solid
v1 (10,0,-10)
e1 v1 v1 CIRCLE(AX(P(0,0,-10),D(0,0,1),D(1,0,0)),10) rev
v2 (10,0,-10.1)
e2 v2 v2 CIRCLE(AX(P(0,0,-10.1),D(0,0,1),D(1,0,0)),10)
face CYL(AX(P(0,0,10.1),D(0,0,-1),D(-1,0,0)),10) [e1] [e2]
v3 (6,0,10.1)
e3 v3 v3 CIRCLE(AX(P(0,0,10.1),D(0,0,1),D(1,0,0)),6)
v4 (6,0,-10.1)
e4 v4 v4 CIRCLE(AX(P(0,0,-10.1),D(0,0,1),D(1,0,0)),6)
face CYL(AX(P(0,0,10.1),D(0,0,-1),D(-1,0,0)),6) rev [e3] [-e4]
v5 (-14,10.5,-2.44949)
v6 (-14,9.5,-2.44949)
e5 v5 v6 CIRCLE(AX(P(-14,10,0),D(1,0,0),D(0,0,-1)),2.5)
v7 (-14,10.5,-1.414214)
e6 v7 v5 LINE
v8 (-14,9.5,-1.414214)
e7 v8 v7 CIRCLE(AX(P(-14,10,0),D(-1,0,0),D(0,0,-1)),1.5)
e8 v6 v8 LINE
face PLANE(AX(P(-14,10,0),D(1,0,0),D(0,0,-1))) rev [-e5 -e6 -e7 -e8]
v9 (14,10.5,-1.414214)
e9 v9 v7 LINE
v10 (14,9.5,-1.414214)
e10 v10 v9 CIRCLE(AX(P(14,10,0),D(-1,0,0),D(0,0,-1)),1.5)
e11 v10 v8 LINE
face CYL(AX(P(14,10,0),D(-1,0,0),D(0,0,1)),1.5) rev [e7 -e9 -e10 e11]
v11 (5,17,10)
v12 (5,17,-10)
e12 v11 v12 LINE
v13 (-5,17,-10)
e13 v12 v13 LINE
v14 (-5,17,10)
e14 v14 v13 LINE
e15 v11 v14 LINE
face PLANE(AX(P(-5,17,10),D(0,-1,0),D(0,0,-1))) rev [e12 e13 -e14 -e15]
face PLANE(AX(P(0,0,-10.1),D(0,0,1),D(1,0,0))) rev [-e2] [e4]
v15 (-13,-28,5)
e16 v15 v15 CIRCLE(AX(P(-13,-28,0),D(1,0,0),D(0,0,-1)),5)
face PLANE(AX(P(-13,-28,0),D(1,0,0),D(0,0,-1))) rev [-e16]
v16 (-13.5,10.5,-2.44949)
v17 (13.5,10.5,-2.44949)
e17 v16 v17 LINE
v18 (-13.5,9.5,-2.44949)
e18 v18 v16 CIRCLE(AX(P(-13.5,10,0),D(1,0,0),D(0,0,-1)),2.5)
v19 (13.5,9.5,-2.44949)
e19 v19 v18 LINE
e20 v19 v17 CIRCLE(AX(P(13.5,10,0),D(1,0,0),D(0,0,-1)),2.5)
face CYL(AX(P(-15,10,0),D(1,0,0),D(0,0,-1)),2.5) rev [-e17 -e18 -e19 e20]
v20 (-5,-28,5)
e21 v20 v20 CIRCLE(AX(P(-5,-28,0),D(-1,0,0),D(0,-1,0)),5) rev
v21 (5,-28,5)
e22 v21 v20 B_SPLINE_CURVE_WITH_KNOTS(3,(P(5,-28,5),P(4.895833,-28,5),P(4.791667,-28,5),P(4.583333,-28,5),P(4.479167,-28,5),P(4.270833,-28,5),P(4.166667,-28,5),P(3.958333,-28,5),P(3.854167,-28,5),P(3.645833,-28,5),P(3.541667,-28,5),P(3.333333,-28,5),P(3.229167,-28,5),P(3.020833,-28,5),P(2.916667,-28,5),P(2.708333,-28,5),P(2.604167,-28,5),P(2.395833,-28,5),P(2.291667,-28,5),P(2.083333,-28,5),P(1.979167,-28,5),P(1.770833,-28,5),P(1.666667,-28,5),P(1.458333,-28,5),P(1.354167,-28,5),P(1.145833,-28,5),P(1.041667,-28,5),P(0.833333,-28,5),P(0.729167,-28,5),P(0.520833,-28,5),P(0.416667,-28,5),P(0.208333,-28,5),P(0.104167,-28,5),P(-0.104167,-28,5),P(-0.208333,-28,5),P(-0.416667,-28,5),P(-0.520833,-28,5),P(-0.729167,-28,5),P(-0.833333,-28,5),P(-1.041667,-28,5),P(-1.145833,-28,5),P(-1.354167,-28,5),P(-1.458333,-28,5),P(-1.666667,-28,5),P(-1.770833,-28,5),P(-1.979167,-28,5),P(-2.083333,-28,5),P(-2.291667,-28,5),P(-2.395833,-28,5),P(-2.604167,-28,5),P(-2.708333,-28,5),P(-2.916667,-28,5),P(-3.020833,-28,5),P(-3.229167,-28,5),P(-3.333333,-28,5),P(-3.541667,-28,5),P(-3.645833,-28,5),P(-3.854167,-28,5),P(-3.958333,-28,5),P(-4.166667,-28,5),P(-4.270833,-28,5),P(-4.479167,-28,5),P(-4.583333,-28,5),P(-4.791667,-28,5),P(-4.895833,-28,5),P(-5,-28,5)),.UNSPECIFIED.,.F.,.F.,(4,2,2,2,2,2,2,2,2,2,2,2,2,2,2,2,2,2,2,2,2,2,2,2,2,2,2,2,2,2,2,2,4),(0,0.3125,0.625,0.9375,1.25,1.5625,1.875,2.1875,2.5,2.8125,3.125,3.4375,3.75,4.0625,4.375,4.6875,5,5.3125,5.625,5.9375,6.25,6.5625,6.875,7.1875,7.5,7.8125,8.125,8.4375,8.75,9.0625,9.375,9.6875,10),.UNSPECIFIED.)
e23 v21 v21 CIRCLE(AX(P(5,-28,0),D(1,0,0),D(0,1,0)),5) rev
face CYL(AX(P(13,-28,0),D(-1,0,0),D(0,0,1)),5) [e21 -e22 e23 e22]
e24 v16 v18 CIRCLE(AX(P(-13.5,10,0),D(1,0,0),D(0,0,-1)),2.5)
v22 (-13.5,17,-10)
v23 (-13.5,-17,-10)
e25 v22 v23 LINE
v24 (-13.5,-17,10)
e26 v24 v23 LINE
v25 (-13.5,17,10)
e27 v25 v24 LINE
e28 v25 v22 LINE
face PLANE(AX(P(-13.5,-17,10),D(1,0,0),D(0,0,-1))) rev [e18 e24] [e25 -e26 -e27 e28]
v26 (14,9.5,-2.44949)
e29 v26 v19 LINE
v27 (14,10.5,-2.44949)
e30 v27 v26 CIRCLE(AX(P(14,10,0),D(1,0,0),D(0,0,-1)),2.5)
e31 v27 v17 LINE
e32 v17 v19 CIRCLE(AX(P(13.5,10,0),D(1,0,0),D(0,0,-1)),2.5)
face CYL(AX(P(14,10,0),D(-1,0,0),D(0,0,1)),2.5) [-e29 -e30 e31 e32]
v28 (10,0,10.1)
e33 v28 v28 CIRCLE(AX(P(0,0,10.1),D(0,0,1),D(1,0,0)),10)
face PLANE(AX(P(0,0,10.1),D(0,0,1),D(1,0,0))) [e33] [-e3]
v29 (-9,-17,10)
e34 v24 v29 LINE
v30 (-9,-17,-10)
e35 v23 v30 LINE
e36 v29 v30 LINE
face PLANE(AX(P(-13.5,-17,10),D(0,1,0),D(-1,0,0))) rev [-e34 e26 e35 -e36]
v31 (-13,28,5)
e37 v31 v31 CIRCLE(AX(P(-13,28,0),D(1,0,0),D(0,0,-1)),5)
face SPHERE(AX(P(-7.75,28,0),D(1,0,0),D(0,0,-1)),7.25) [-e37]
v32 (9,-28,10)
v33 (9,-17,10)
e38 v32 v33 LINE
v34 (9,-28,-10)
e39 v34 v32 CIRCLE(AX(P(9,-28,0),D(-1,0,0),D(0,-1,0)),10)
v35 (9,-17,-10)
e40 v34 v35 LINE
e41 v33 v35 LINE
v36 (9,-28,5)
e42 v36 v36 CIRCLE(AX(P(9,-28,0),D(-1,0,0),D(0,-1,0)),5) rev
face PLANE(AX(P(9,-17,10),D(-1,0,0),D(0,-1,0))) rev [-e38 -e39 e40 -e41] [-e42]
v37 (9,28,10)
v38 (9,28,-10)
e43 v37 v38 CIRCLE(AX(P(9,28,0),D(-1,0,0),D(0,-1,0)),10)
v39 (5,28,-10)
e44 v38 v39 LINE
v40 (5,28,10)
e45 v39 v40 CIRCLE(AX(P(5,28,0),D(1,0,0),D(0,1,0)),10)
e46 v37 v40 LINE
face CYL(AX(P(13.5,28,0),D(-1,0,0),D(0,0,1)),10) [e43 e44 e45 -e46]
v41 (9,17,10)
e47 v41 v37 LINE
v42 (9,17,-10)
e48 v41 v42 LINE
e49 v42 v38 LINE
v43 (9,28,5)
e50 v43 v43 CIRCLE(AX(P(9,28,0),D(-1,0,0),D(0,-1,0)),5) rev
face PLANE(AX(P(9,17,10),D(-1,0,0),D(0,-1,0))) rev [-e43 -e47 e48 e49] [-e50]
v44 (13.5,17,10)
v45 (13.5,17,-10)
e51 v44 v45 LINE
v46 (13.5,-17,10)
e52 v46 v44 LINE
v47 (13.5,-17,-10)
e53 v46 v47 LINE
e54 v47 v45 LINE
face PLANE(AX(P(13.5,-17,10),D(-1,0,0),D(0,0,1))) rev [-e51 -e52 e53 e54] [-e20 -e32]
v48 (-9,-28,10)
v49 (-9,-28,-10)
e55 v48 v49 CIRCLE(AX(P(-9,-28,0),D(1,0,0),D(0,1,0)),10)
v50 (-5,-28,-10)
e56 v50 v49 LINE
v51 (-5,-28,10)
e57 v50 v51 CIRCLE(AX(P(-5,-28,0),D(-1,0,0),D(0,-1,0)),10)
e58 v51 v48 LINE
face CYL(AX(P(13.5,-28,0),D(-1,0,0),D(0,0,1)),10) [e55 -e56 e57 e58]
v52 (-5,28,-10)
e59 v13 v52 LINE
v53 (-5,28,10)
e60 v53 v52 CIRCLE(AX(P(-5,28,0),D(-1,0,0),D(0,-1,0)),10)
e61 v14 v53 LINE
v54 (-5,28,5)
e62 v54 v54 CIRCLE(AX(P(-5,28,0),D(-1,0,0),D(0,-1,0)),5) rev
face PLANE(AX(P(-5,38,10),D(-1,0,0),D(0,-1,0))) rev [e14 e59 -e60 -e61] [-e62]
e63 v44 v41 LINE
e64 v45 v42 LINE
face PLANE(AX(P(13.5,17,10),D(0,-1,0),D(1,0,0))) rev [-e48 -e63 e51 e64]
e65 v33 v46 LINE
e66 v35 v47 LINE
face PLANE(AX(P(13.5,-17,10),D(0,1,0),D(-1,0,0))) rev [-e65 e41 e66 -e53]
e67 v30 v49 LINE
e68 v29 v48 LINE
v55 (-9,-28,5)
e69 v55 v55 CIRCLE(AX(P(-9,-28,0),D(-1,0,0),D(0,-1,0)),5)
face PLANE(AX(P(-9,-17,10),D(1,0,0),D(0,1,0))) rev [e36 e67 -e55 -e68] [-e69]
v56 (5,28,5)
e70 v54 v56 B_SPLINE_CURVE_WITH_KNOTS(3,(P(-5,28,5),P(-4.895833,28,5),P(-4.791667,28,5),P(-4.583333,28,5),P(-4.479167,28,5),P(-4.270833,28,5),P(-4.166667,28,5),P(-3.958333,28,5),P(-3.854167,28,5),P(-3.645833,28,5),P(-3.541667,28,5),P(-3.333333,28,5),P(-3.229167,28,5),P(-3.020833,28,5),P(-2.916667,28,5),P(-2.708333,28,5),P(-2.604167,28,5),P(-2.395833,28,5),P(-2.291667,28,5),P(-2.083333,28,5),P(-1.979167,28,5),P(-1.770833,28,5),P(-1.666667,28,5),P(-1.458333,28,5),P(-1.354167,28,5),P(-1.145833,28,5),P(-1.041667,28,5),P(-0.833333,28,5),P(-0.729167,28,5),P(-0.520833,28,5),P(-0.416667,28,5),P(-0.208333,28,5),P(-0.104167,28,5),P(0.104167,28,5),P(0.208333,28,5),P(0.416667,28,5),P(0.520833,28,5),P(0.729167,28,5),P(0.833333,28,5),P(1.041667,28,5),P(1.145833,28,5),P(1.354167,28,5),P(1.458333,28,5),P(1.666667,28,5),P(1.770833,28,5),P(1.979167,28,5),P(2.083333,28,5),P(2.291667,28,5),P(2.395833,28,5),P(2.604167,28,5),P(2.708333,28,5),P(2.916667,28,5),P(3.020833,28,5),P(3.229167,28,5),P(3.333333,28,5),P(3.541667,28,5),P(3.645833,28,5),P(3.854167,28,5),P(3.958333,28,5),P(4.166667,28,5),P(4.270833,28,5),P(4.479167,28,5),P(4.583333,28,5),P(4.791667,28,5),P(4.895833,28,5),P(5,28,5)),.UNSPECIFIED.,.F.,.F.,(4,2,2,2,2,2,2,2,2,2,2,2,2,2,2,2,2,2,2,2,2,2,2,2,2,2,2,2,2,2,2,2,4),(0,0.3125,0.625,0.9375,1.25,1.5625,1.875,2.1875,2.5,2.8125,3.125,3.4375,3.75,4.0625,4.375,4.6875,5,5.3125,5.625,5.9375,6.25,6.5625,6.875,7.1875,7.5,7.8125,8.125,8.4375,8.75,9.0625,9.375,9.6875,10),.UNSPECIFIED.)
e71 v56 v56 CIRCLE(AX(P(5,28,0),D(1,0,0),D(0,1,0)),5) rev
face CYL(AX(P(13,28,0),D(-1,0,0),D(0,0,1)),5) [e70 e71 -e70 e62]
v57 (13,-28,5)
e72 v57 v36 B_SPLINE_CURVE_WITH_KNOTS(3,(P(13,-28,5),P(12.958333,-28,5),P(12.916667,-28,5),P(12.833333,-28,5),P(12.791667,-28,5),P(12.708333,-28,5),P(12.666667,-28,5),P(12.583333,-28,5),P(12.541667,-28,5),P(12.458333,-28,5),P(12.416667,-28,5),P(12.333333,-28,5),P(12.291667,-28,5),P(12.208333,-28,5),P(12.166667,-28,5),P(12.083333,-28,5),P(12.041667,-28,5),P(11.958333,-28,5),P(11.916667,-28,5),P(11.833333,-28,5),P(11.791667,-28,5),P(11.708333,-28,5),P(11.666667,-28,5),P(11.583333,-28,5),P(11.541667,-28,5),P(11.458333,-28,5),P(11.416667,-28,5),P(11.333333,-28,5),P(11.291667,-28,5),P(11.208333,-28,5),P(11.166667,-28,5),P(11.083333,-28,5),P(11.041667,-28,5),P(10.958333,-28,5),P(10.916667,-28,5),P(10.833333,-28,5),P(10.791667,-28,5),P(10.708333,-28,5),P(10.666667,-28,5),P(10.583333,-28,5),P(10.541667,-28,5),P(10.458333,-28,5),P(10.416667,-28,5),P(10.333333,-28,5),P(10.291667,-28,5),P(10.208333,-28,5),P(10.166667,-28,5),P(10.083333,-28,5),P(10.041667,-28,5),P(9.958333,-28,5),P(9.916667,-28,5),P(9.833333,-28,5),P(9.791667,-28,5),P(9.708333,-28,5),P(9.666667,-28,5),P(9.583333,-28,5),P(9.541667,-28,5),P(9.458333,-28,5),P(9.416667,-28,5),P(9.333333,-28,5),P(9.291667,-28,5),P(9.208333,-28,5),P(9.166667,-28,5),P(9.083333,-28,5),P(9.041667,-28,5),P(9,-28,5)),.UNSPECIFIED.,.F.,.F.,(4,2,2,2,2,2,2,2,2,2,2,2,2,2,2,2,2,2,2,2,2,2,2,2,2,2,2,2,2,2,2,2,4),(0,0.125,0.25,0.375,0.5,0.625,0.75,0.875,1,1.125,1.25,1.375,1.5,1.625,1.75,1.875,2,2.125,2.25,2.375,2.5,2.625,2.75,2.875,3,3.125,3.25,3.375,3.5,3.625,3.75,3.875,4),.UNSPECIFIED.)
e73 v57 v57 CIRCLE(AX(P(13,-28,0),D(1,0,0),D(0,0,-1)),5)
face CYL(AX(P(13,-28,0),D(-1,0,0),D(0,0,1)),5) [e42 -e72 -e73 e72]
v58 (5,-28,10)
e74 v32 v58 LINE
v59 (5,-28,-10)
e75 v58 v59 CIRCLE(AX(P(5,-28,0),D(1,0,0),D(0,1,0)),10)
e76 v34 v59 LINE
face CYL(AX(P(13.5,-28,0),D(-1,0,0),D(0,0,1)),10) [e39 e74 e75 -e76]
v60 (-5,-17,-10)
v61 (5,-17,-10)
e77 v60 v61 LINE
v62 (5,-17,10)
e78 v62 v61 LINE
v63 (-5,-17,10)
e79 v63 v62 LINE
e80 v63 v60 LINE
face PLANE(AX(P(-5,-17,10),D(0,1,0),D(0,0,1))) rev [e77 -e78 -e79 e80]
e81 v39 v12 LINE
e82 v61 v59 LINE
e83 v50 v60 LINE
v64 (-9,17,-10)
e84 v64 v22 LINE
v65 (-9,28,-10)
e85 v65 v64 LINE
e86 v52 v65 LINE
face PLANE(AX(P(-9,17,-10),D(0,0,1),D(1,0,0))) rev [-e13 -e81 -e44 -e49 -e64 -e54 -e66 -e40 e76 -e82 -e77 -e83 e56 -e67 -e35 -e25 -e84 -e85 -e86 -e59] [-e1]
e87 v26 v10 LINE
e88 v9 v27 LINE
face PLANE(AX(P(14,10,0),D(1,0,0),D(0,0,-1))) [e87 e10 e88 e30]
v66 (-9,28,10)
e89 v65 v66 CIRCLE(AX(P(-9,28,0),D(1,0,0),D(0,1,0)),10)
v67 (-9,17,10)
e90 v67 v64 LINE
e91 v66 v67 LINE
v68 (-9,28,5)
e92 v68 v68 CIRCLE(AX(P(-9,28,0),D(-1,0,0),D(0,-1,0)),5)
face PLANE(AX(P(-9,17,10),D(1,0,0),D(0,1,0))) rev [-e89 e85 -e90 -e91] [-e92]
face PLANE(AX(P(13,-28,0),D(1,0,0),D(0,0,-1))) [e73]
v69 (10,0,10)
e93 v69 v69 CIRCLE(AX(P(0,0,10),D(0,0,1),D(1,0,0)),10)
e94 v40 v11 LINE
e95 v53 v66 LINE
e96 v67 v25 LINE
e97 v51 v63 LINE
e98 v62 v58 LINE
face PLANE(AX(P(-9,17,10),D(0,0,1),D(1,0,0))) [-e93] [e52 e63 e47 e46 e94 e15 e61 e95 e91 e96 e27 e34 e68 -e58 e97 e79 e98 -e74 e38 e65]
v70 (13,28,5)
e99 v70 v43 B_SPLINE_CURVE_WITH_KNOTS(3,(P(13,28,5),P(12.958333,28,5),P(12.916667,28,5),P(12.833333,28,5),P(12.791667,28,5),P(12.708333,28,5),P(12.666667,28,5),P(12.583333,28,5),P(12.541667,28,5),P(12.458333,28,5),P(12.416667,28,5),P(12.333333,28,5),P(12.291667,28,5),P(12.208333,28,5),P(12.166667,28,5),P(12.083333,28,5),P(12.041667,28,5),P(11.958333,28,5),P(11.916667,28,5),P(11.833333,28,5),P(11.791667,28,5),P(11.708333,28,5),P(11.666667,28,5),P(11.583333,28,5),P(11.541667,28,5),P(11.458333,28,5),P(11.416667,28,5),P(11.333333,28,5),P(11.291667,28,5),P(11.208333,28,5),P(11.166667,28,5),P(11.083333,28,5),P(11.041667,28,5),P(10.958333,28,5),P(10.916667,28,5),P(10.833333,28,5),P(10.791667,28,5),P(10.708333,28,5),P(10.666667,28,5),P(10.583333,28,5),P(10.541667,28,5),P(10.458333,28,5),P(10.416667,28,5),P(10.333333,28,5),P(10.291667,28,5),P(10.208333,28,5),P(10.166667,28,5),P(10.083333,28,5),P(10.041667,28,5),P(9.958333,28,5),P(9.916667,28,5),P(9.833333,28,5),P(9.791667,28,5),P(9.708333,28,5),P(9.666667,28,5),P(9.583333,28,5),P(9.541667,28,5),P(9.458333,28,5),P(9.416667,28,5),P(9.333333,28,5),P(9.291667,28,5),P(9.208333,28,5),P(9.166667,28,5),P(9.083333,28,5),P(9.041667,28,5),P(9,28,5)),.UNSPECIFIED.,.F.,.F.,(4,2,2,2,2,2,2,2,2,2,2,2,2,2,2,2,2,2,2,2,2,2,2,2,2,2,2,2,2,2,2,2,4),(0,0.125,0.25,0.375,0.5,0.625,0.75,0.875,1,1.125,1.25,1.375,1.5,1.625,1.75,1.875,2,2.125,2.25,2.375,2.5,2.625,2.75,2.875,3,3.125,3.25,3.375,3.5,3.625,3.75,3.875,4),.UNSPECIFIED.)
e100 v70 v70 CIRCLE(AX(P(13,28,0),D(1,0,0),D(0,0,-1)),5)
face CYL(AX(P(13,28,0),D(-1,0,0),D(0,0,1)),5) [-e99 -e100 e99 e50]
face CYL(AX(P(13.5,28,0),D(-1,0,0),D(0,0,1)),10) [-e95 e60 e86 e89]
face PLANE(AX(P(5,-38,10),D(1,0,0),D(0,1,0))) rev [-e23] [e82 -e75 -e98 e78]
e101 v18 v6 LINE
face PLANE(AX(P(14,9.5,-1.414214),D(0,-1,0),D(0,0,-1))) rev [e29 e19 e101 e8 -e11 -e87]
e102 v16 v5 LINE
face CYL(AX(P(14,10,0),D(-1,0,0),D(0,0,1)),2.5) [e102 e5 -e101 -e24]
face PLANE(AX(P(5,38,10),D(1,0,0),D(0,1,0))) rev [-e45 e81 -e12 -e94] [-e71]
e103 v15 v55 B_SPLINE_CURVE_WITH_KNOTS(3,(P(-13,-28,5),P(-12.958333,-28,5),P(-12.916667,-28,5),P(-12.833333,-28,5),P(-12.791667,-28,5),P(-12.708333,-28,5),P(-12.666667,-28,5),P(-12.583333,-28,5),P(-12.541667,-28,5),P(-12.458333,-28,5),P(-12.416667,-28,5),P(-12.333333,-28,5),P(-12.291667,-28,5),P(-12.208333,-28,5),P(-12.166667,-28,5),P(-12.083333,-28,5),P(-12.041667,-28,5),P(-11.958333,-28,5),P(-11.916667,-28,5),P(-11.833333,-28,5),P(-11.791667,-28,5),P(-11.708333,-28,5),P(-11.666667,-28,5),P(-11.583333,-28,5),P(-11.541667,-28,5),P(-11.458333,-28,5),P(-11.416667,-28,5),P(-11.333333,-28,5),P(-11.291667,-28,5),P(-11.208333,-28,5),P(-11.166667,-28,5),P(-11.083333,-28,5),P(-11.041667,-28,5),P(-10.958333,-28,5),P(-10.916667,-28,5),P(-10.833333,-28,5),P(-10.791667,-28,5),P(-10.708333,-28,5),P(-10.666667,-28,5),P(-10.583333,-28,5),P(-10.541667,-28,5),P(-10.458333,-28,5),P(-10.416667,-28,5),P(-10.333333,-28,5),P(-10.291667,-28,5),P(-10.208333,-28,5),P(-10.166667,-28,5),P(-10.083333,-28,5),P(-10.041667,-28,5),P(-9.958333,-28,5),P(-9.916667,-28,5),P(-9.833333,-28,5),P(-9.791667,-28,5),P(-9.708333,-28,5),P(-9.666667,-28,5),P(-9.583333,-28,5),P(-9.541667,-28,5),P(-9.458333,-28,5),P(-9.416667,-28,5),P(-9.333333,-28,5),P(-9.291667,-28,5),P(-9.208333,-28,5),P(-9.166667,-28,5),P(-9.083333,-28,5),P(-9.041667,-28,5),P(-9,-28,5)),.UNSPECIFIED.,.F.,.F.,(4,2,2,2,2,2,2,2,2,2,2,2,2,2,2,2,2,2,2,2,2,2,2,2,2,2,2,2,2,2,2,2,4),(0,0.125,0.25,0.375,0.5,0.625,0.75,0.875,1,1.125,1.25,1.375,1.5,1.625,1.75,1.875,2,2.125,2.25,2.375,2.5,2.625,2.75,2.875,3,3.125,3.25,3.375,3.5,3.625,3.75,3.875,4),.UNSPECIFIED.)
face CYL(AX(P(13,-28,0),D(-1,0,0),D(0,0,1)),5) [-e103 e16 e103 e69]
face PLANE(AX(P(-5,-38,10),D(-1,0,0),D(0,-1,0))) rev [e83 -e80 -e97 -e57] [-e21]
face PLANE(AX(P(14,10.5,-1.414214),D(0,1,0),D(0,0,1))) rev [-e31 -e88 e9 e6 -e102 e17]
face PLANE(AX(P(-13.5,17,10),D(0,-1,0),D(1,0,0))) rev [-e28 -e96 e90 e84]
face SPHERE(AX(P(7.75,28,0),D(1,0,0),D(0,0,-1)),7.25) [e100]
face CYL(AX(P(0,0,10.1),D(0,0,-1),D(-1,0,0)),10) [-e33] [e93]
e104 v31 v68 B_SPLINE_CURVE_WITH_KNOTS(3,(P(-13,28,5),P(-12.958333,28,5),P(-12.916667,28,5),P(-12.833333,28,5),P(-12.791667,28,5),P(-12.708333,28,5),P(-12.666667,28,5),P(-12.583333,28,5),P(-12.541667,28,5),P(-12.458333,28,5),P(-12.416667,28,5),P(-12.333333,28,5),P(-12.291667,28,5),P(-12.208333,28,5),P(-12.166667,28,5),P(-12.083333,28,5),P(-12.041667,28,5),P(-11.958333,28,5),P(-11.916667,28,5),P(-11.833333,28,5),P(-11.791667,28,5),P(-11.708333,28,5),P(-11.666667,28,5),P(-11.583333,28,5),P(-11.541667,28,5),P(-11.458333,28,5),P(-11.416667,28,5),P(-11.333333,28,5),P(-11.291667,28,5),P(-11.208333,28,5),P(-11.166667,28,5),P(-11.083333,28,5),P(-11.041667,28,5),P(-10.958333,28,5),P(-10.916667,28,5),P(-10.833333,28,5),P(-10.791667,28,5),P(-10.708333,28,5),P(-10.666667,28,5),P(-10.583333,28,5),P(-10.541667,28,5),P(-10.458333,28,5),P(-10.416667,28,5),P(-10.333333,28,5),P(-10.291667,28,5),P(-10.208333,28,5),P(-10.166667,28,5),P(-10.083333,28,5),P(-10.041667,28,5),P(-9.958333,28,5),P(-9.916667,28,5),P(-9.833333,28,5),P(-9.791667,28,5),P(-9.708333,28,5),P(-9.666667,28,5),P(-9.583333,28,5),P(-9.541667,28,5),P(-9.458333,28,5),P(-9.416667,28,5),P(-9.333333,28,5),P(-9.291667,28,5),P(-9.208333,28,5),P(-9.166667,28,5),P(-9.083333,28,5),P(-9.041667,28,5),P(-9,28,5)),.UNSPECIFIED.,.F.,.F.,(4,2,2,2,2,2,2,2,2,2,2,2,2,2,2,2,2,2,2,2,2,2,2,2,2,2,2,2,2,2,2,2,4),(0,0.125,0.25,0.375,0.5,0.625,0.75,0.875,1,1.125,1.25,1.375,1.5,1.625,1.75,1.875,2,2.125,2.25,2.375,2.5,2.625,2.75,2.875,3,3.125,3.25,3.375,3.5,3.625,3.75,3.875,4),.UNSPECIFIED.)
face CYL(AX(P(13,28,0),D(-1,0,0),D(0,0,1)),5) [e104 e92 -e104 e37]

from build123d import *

# Parameters (mm, degrees)
ESQUISSE1_R          = 10
BASE_EXTRUSION_DEPTH = 10
ESQUISSE2_OUTSIDE_W  = 38.62
ESQUISSE2_OUTSIDE_H  = 94.62
D_TOURAGE_DEPTH      = 48.675989764
ESQUISSE3_R          = 5
AL_SAGES_DEPTH       = 46.279686395
ESQUISSE4_R          = 5
AXES_DEPTH           = 13
ESQUISSE5_R          = 10
ESQUISSE5_R_2        = 6
ECROU_RAPPORT_DEPTH  = 10.1
ESQUISSE6_R          = 2.5
PER_AGE_DEPTH        = 49.561919237
GOUPILLE_DEPTH       = 14


# Read off the part's stored shape, not the designer's step: Dôme1, Dôme2
with BuildPart() as part:
    # Esquisse1 → Base-Extrusion (new, symmetric)
    with BuildSketch(Plane.XY):
        Polygon((-13.5, -17), (-13.5, 17), (-9, 17), (-9, 38), (-5, 38), (-5, 17), (5, 17), (5, 38), (9, 38), (9, 17), (13.5, 17), (13.5, -17), (9, -17), (9, -38), (5, -38), (5, -17), (-5, -17), (-5, -38), (-9, -38), (-9, -17), align=None)
        Circle(ESQUISSE1_R, mode=Mode.SUBTRACT)
    extrude(amount=BASE_EXTRUSION_DEPTH, both=True)

    # Esquisse2 outside → Détourage (cut, through all)
    with BuildSketch(Plane.ZY.offset(13.5)):
        Rectangle(ESQUISSE2_OUTSIDE_W, ESQUISSE2_OUTSIDE_H)
        with BuildLine():
            Line((-10, 28), (-10, -28))
            ThreePointArc((-10, -28), (0, -38), (10, -28))
            Line((10, -28), (10, 28))
            ThreePointArc((10, 28), (0, 38), (-10, 28))
        make_face(mode=Mode.SUBTRACT)
    extrude(amount=-D_TOURAGE_DEPTH, mode=Mode.SUBTRACT)

    # Esquisse3 → Alésages (cut, through all)
    with BuildSketch(Plane.ZY.offset(9)):
        with Locations(Location((0, 28, 0), (0, 0, 270))):
            Circle(ESQUISSE3_R)
        with Locations(Location((0, -28, 0), (0, 0, 270))):
            Circle(ESQUISSE3_R)
    extrude(amount=-AL_SAGES_DEPTH, mode=Mode.SUBTRACT)

    # Esquisse4 → Axes (add, symmetric)
    with BuildSketch(Plane(origin=(0, 0, 0), x_dir=(0, 0, -1), z_dir=(1, 0, 0))):
        with Locations(Location((0, -28, 0), (0, 0, 180))):
            Circle(ESQUISSE4_R)
        with Locations(Location((0, 28, 0), (0, 0, 180))):
            Circle(ESQUISSE4_R)
    extrude(amount=AXES_DEPTH, both=True)

    # Dôme1 outline → Dôme1 (revolve)
    with BuildSketch(Plane(origin=(0, 28, 0), x_dir=(0, 1, 0), z_dir=(0, 0, -1))):
        with BuildLine():
            Line((0, 13), (5.000000005, 12.999999995))
            ThreePointArc((5.000000005, 12.999999995), (2.692582407, 14.481456008), (0, 15))
            Line((0, 15), (0, 13))
        make_face()
    revolve(axis=Axis((0, 28, 0), (1, 0, 0)))

    # Dôme2 outline → Dôme2 (revolve)
    with BuildSketch(Plane(origin=(0, 28, 0), x_dir=(0, 1, 0), z_dir=(0, 0, -1))):
        with BuildLine():
            Line((0, -12.999999995), (0, -15))
            ThreePointArc((0, -15), (2.692582407, -14.481456008), (5.000000005, -12.999999995))
            Line((5.000000005, -12.999999995), (0, -12.999999995))
        make_face()
    revolve(axis=Axis((0, 28, 0), (1, 0, 0)))

    # Esquisse5 → Ecrou rapporté (add, symmetric)
    with BuildSketch(Plane.XY):
        Circle(ESQUISSE5_R)
        Circle(ESQUISSE5_R_2, mode=Mode.SUBTRACT)
    extrude(amount=ECROU_RAPPORT_DEPTH, both=True)

    # Esquisse6 → Perçage (cut, through all)
    with BuildSketch(Plane(origin=(13.5, 0, 0), x_dir=(0, 0, -1), z_dir=(1, 0, 0))):
        with Locations((0, 10)):
            Circle(ESQUISSE6_R)
    extrude(amount=-PER_AGE_DEPTH, mode=Mode.SUBTRACT)

    # Esquisse7 → Goupille (add, symmetric)
    with BuildSketch(Plane(origin=(0, 0, 0), x_dir=(0, 0, -1), z_dir=(1, 0, 0))):
        with BuildLine():
            Line((1.414213562, 10.5), (2.449489743, 10.5))
            ThreePointArc((2.449489743, 10.5), (-2.5, 10), (2.449489743, 9.5))
            Line((2.449489743, 9.5), (1.414213562, 9.5))
            ThreePointArc((1.414213562, 9.5), (-1.5, 10), (1.414213562, 10.5))
        make_face()
    extrude(amount=GOUPILLE_DEPTH, both=True)


solid = part.part
